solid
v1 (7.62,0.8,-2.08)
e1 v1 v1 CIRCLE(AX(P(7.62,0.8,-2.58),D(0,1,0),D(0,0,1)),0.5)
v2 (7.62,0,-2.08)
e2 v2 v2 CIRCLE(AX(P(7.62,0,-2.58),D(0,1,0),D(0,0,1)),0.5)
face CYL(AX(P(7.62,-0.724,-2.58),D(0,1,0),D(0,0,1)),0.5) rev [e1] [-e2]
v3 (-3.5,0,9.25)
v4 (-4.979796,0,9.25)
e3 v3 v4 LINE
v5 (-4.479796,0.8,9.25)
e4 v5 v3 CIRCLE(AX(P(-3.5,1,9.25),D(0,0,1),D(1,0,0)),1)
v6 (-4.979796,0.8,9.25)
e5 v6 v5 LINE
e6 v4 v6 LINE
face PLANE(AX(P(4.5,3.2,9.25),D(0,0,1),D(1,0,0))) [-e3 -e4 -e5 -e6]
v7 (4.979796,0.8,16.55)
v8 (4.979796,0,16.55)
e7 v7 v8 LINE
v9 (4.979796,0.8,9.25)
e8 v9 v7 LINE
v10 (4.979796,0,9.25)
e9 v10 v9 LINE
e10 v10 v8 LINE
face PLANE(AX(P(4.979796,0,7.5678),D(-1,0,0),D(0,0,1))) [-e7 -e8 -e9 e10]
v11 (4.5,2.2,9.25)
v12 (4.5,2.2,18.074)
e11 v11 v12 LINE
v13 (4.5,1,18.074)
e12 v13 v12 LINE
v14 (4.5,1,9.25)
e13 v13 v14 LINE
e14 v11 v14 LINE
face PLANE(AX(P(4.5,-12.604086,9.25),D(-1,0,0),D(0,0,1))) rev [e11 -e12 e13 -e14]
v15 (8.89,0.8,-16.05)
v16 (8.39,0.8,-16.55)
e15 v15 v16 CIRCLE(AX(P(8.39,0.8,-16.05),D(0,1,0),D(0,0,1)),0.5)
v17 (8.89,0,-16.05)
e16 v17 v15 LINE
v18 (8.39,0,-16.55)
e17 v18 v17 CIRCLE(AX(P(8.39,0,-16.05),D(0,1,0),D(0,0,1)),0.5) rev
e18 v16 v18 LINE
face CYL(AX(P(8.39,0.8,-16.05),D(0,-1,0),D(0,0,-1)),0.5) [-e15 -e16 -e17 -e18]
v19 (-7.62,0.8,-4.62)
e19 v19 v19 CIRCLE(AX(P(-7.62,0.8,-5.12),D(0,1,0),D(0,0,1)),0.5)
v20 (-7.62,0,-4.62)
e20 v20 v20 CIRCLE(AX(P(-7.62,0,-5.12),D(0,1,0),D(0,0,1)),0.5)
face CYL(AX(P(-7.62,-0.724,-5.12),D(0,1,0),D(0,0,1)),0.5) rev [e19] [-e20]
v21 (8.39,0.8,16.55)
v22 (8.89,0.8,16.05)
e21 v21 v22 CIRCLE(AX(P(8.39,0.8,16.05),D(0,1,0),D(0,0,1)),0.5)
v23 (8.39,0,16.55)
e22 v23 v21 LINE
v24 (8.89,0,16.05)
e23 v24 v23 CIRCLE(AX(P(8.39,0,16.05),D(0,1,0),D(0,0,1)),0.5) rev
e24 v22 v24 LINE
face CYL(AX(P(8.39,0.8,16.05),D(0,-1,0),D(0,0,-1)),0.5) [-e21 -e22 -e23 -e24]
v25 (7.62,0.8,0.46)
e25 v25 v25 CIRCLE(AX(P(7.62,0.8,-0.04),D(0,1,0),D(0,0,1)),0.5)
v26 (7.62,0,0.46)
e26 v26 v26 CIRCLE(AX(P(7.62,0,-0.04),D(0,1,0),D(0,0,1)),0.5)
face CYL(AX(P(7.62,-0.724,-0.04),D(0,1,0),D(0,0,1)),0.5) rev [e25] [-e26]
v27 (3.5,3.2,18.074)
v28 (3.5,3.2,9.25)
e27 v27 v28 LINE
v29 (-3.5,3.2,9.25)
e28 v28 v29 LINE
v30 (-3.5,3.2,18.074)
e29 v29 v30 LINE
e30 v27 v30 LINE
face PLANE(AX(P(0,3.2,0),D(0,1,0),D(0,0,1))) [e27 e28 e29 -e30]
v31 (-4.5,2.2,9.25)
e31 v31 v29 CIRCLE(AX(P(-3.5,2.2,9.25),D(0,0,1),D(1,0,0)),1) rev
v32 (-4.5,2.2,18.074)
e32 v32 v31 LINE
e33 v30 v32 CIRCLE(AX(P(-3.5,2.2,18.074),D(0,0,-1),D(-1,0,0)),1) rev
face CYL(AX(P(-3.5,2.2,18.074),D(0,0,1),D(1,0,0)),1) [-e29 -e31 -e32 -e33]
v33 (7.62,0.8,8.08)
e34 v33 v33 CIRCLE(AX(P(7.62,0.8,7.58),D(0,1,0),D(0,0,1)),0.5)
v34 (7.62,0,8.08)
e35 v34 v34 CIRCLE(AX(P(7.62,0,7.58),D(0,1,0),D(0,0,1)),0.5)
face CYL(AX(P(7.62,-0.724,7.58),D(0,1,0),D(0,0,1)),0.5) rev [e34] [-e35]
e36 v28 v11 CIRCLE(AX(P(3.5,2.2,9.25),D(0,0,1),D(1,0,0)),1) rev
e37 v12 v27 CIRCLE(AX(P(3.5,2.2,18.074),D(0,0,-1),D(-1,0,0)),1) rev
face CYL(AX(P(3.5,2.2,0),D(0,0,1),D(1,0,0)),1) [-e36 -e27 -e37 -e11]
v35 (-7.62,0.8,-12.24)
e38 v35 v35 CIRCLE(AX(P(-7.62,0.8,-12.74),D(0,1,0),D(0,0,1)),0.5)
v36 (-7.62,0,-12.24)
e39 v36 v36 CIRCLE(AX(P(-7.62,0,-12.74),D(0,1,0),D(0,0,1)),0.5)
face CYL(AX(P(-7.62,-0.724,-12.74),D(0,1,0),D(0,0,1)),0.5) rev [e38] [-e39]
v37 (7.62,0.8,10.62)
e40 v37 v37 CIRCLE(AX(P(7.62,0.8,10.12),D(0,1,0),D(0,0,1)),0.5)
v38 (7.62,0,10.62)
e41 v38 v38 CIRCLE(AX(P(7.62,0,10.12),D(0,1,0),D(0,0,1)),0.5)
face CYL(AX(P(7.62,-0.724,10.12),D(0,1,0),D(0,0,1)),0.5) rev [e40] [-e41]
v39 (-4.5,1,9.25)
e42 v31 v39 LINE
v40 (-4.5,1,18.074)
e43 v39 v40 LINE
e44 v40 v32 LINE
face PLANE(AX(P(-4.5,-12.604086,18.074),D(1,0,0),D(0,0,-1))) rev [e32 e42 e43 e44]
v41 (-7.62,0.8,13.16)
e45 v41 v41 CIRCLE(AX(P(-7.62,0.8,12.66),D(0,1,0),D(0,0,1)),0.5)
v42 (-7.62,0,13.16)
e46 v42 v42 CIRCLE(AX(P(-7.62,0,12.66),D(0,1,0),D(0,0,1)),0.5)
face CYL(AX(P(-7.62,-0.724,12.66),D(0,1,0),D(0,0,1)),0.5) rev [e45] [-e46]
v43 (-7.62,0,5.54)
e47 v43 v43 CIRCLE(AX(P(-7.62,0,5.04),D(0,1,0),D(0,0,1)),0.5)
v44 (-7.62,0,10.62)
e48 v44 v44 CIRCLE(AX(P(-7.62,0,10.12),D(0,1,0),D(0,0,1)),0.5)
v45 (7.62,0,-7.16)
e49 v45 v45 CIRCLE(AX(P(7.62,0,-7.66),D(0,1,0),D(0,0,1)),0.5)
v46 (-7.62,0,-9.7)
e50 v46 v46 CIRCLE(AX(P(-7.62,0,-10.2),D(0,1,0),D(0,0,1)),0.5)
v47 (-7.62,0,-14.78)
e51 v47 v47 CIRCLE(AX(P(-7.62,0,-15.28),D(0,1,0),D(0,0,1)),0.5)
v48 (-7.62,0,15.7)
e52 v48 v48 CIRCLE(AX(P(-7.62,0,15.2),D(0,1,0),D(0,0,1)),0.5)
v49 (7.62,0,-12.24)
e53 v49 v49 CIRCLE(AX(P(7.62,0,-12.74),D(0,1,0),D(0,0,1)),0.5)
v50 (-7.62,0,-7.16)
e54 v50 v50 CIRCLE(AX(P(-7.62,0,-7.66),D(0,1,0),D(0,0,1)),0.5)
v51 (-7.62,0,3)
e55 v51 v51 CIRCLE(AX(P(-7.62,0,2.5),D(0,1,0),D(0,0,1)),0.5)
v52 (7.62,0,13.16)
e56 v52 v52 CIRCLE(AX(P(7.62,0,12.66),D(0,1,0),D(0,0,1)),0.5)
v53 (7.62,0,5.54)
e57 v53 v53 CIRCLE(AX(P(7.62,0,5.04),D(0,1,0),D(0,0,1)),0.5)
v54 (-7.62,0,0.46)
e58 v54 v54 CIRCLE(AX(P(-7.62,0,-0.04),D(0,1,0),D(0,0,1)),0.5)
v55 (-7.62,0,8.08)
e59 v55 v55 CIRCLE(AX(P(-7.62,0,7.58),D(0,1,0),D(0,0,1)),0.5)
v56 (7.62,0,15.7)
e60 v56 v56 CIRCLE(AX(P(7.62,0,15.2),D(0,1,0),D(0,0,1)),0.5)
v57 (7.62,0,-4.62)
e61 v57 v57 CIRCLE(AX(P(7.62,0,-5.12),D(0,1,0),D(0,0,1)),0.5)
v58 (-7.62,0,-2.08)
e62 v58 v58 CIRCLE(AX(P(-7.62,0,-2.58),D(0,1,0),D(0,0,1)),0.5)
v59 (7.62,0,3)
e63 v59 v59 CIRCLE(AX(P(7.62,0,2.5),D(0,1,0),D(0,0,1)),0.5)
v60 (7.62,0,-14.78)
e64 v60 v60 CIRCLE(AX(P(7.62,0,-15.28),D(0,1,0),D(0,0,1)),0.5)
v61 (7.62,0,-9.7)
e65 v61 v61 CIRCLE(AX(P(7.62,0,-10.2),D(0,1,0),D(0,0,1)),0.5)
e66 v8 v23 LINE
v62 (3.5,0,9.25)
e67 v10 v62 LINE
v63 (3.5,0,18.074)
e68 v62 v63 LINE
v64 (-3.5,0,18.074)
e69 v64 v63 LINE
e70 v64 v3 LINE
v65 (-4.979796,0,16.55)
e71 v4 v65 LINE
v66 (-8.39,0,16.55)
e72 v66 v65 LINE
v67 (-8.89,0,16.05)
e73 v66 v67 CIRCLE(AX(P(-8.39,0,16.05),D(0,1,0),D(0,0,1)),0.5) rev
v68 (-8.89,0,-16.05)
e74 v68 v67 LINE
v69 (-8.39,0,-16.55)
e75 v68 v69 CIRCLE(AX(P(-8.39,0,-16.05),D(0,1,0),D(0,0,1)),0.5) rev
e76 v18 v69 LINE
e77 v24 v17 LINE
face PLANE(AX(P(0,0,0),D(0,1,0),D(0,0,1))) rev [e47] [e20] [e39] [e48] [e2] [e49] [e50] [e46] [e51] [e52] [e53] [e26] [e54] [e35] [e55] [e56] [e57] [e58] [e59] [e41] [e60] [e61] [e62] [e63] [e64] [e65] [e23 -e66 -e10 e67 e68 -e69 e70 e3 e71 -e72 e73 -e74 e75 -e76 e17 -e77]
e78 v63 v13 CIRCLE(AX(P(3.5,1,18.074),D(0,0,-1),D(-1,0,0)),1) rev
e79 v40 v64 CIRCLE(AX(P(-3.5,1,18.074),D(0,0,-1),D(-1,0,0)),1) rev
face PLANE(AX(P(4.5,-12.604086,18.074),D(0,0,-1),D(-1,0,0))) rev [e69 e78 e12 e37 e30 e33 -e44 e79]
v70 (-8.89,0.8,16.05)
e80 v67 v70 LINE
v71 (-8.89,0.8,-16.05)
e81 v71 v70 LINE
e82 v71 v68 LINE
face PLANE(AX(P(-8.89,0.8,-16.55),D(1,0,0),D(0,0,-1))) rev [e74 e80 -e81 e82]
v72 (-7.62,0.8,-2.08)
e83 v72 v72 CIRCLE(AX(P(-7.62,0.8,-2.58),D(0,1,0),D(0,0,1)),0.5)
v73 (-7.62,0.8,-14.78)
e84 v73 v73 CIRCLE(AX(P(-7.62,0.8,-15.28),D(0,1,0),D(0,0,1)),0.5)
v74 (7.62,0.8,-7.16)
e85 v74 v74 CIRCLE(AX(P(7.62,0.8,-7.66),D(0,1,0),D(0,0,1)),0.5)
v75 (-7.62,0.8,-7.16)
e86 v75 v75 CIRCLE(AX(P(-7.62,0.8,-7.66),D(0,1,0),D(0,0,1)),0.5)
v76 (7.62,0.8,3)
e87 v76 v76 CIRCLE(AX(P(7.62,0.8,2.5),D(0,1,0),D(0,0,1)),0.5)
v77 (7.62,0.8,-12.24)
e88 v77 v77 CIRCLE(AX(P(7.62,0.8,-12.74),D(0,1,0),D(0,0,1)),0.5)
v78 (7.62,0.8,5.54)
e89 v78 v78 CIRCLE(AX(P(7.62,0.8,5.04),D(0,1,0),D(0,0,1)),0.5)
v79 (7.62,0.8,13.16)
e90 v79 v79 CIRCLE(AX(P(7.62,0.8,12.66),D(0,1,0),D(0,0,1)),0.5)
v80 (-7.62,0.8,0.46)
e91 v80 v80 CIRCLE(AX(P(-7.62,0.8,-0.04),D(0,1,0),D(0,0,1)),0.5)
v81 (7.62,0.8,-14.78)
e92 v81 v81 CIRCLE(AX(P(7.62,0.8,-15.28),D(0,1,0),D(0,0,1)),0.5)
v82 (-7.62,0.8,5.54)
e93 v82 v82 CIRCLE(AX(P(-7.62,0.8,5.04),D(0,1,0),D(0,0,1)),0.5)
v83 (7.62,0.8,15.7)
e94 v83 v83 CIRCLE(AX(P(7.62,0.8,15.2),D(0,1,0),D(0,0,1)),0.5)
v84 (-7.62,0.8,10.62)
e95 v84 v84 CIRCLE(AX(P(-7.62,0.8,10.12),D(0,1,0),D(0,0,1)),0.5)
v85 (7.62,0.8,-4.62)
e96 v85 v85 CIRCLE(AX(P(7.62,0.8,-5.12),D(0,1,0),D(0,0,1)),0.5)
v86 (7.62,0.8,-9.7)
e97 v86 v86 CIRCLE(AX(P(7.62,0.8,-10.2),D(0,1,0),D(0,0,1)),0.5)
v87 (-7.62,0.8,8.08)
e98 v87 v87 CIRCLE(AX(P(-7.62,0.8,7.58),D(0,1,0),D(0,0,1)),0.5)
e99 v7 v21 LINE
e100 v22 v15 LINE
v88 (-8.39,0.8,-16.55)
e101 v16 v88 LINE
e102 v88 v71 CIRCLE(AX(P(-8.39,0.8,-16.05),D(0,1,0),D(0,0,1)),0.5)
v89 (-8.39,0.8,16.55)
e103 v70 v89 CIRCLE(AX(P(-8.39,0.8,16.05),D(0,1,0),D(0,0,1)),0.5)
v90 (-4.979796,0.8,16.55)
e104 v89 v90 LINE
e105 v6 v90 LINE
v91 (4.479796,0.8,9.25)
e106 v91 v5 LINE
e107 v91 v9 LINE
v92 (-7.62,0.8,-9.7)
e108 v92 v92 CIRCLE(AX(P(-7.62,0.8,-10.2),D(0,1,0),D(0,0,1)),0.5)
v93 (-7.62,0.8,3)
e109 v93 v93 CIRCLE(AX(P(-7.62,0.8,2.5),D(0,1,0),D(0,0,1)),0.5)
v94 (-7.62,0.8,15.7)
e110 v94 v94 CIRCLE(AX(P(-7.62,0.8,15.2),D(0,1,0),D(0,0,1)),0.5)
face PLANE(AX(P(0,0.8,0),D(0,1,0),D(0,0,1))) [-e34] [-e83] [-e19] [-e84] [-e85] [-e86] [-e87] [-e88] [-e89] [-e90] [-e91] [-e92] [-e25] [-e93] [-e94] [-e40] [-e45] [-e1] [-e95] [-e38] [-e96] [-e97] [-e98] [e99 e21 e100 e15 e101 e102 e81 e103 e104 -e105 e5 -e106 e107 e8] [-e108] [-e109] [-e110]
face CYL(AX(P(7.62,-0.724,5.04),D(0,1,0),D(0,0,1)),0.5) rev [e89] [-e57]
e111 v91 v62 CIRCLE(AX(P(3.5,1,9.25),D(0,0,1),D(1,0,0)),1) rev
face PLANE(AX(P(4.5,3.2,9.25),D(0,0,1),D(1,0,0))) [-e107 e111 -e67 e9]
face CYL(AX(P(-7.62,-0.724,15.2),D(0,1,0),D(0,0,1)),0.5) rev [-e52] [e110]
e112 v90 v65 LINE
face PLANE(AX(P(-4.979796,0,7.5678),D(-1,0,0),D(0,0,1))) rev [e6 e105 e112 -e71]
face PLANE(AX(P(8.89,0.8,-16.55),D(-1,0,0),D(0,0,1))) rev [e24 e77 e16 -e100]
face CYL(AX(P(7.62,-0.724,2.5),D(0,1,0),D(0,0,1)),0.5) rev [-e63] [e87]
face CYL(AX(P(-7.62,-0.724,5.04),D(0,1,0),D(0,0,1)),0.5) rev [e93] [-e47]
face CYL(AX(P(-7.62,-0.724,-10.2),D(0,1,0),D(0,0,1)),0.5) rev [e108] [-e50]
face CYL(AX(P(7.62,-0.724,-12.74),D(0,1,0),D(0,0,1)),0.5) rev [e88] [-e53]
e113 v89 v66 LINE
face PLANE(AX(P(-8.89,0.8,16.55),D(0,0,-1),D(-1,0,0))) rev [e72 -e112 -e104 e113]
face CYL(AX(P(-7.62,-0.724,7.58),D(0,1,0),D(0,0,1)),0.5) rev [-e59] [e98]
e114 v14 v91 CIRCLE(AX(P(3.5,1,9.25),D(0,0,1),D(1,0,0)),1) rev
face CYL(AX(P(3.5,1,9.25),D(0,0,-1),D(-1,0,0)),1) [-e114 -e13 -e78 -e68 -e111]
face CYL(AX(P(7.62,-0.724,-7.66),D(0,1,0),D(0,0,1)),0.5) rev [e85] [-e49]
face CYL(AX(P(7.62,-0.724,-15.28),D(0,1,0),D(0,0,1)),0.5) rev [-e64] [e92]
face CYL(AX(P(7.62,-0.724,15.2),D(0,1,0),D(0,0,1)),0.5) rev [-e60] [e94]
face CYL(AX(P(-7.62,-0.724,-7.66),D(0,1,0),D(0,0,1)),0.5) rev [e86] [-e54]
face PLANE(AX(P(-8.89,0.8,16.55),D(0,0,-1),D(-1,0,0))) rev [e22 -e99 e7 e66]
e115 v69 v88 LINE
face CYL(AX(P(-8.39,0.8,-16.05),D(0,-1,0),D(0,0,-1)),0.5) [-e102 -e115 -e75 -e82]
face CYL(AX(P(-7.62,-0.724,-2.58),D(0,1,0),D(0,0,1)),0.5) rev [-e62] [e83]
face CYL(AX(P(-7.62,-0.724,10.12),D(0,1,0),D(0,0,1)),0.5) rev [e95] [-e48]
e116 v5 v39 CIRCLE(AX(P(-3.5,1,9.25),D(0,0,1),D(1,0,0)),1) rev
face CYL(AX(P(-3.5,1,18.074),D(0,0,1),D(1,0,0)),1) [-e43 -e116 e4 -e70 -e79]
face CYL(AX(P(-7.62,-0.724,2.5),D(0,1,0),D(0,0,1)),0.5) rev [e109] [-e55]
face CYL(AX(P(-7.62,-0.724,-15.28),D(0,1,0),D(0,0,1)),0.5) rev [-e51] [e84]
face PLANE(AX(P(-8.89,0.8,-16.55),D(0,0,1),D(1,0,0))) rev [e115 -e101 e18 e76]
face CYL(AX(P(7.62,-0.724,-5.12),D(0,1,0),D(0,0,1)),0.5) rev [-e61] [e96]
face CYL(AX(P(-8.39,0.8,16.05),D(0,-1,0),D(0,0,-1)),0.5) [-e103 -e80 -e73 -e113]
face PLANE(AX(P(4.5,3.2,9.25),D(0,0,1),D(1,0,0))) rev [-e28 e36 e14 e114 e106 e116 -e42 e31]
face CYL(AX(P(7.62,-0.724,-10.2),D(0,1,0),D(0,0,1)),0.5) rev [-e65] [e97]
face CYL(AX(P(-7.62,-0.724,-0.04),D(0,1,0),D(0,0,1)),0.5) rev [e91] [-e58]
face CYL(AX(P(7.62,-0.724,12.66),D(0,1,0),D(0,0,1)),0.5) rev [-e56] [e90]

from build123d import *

# Parameters (mm, degrees)
SKETCH1_W           = 17.78
SKETCH1_H           = 33.1
BOSS_EXTRUDE1_DEPTH = 0.8
FILLET1_R           = 0.5
SKETCH2_W           = 9
SKETCH2_H           = 7.3
CUT_EXTRUDE1_DEPTH  = 0.8
SKETCH2_3_W         = 9
SKETCH2_3_H         = 7.3
BOSS_EXTRUDE2_DEPTH = 2.4
SKETCH4_W           = 9
SKETCH4_H           = 2.4
BOSS_EXTRUDE3_DEPTH = 1.524
SKETCH5_W           = 9
SKETCH5_H           = 8.824
BOSS_EXTRUDE4_DEPTH = 0.8
SKETCH6_R           = 0.5
CUT_EXTRUDE2_DEPTH  = 1.524
FILLET2_START       = 8
FILLET2_DEPTH       = 11
FILLET2_START_2     = 16.55
FILLET2_2_DEPTH     = 2.45
CUT_EXTRUDE5_START  = -7.3
CUT_EXTRUDE5_DEPTH  = 7.3


with BuildPart() as part:
    # Sketch1 → Boss-Extrude1 (new body)
    with BuildSketch(Plane(origin=(0, 0, 0), x_dir=(1, 0, 0), z_dir=(0, 1, 0))):
        Rectangle(SKETCH1_W, SKETCH1_H)
    extrude(amount=BOSS_EXTRUDE1_DEPTH)

    # Fillet1
    fillet1_edges = [part.edges().sort_by_distance(p)[0] for p in [
        (-8.89, 0.4, -16.55),
        (8.89, 0.4, -16.55),
        (8.89, 0.4, 16.55),
        (-8.89, 0.4, 16.55),
    ]]
    fillet(fillet1_edges, radius=FILLET1_R)

    # Sketch2 → Cut-Extrude1 (cut)
    with BuildSketch(Plane(origin=(0, 0.8, 0), x_dir=(1, 0, 0), z_dir=(0, 1, 0))):
        with Locations((0, -12.9)):
            Rectangle(SKETCH2_W, SKETCH2_H)
    extrude(amount=-CUT_EXTRUDE1_DEPTH, mode=Mode.SUBTRACT)



with BuildPart() as body_2:
    # Sketch2<3> → Boss-Extrude2 (new body)
    with BuildSketch(Plane(origin=(0, 0.8, 0), x_dir=(1, 0, 0), z_dir=(0, 1, 0))):
        with Locations((0, -12.9)):
            Rectangle(SKETCH2_3_W, SKETCH2_3_H)
    extrude(amount=BOSS_EXTRUDE2_DEPTH)

    # Sketch4 → Boss-Extrude3 (add)
    with BuildSketch(Plane.XY.offset(16.55)):
        with Locations((0, 2)):
            Rectangle(SKETCH4_W, SKETCH4_H)
    extrude(amount=BOSS_EXTRUDE3_DEPTH)


with BuildPart() as part_1:
    add(part.part)

    add(body_2.part)  # Boss-Extrude4 merges body 2
    # Sketch5 → Boss-Extrude4 (add)
    with BuildSketch(Plane.XZ.offset(-0.8)):
        with Locations((0, 13.662)):
            Rectangle(SKETCH5_W, SKETCH5_H)
    extrude(amount=BOSS_EXTRUDE4_DEPTH)

    # Sketch6 → Cut-Extrude2 (cut)
    with BuildSketch(Plane(origin=(0, 0.8, 0), x_dir=(1, 0, 0), z_dir=(0, 1, 0))):
        with Locations(Location((-7.62, 15.28, 0), (0, 0, 270))):
            Circle(SKETCH6_R)
        with Locations(Location((7.62, 15.28, 0), (0, 0, 270))):
            Circle(SKETCH6_R)
        with Locations(Location((7.62, 12.74, 0), (0, 0, 270))):
            Circle(SKETCH6_R)
        with Locations(Location((7.62, 10.2, 0), (0, 0, 270))):
            Circle(SKETCH6_R)
        with Locations(Location((7.62, 7.66, 0), (0, 0, 270))):
            Circle(SKETCH6_R)
        with Locations(Location((7.62, 5.12, 0), (0, 0, 270))):
            Circle(SKETCH6_R)
        with Locations(Location((7.62, 2.58, 0), (0, 0, 270))):
            Circle(SKETCH6_R)
        with Locations(Location((7.62, 0.04, 0), (0, 0, 270))):
            Circle(SKETCH6_R)
        with Locations(Location((7.62, -2.5, 0), (0, 0, 270))):
            Circle(SKETCH6_R)
        with Locations(Location((7.62, -5.04, 0), (0, 0, 270))):
            Circle(SKETCH6_R)
        with Locations(Location((7.62, -7.58, 0), (0, 0, 270))):
            Circle(SKETCH6_R)
        with Locations(Location((7.62, -10.12, 0), (0, 0, 270))):
            Circle(SKETCH6_R)
        with Locations(Location((7.62, -12.66, 0), (0, 0, 270))):
            Circle(SKETCH6_R)
        with Locations(Location((7.62, -15.2, 0), (0, 0, 270))):
            Circle(SKETCH6_R)
        with Locations(Location((-7.62, 12.74, 0), (0, 0, 270))):
            Circle(SKETCH6_R)
        with Locations(Location((-7.62, 10.2, 0), (0, 0, 270))):
            Circle(SKETCH6_R)
        with Locations(Location((-7.62, 7.66, 0), (0, 0, 270))):
            Circle(SKETCH6_R)
        with Locations(Location((-7.62, 5.12, 0), (0, 0, 270))):
            Circle(SKETCH6_R)
        with Locations(Location((-7.62, 2.58, 0), (0, 0, 270))):
            Circle(SKETCH6_R)
        with Locations(Location((-7.62, 0.04, 0), (0, 0, 270))):
            Circle(SKETCH6_R)
        with Locations(Location((-7.62, -2.5, 0), (0, 0, 270))):
            Circle(SKETCH6_R)
        with Locations(Location((-7.62, -5.04, 0), (0, 0, 270))):
            Circle(SKETCH6_R)
        with Locations(Location((-7.62, -7.58, 0), (0, 0, 270))):
            Circle(SKETCH6_R)
        with Locations(Location((-7.62, -10.12, 0), (0, 0, 270))):
            Circle(SKETCH6_R)
        with Locations(Location((-7.62, -12.66, 0), (0, 0, 270))):
            Circle(SKETCH6_R)
        with Locations(Location((-7.62, -15.2, 0), (0, 0, 270))):
            Circle(SKETCH6_R)
    extrude(amount=-CUT_EXTRUDE2_DEPTH, mode=Mode.SUBTRACT)

    # Fillet2: read off the stored shape, not the designer's step
    # Fillet2 outline → Fillet2 (cut)
    with BuildSketch(Plane.XY.offset(FILLET2_START)):
        with BuildLine():
            ThreePointArc((-4.5, 2.2), (-4.207106781, 2.907106781), (-3.5, 3.2))
            Line((-3.5, 3.2), (-4.5, 3.2))
            Line((-4.5, 3.2), (-4.5, 2.2))
        make_face()
        with BuildLine():
            Line((4.5, 3.2), (3.5, 3.2))
            ThreePointArc((3.5, 3.2), (4.207106781, 2.907106781), (4.5, 2.2))
            Line((4.5, 2.2), (4.5, 3.2))
        make_face()
        with BuildLine():
            ThreePointArc((-4.479795897, 0.8), (-4.494936153, 0.899491038), (-4.5, 1))
            Line((-4.5, 1), (-4.5, 0.8))
            Line((-4.5, 0.8), (-4.479795897, 0.8))
        make_face()
        with BuildLine():
            Line((4.5, 0.8), (4.5, 1))
            ThreePointArc((4.5, 1), (4.494936153, 0.899491038), (4.479795897, 0.8))
            Line((4.479795897, 0.8), (4.5, 0.8))
        make_face()
    extrude(amount=FILLET2_DEPTH, mode=Mode.SUBTRACT)

    # Fillet2 2 outline → Fillet2 2 (cut)
    with BuildSketch(Plane.XY.offset(FILLET2_START_2)):
        with BuildLine():
            ThreePointArc((-3.5, 0), (-4.132455532, 0.225403331), (-4.479795897, 0.8))
            Line((-4.479795897, 0.8), (-4.5, 0.8))
            Line((-4.5, 0.8), (-4.5, 0))
            Line((-4.5, 0), (-3.5, 0))
        make_face()
        with BuildLine():
            Line((4.5, 0.8), (4.479795897, 0.8))
            ThreePointArc((4.479795897, 0.8), (4.132455532, 0.225403331), (3.5, 0))
            Line((3.5, 0), (4.5, 0))
            Line((4.5, 0), (4.5, 0.8))
        make_face()
    extrude(amount=FILLET2_2_DEPTH, mode=Mode.SUBTRACT)

    # Sketch7 → Cut-Extrude5 (cut)
    with BuildSketch(Plane.XY.offset(16.55).offset(CUT_EXTRUDE5_START)):
        with BuildLine():
            Line((4.979795897, 0), (4.979795897, 0.8))
            Line((4.979795897, 0.8), (4.479795897, 0.8))
            ThreePointArc((4.479795897, 0.8), (4.132455532, 0.225403331), (3.5, 0))
            Line((3.5, 0), (4.979795897, 0))
        make_face()
        with BuildLine():
            Line((-4.979795897, 0.8), (-4.979795897, 0))
            Line((-4.979795897, 0), (-3.5, 0))
            ThreePointArc((-3.5, 0), (-4.132455532, 0.225403331), (-4.479795897, 0.8))
            Line((-4.479795897, 0.8), (-4.979795897, 0.8))
        make_face()
    extrude(amount=CUT_EXTRUDE5_DEPTH, mode=Mode.SUBTRACT)


solid = part_1.part
